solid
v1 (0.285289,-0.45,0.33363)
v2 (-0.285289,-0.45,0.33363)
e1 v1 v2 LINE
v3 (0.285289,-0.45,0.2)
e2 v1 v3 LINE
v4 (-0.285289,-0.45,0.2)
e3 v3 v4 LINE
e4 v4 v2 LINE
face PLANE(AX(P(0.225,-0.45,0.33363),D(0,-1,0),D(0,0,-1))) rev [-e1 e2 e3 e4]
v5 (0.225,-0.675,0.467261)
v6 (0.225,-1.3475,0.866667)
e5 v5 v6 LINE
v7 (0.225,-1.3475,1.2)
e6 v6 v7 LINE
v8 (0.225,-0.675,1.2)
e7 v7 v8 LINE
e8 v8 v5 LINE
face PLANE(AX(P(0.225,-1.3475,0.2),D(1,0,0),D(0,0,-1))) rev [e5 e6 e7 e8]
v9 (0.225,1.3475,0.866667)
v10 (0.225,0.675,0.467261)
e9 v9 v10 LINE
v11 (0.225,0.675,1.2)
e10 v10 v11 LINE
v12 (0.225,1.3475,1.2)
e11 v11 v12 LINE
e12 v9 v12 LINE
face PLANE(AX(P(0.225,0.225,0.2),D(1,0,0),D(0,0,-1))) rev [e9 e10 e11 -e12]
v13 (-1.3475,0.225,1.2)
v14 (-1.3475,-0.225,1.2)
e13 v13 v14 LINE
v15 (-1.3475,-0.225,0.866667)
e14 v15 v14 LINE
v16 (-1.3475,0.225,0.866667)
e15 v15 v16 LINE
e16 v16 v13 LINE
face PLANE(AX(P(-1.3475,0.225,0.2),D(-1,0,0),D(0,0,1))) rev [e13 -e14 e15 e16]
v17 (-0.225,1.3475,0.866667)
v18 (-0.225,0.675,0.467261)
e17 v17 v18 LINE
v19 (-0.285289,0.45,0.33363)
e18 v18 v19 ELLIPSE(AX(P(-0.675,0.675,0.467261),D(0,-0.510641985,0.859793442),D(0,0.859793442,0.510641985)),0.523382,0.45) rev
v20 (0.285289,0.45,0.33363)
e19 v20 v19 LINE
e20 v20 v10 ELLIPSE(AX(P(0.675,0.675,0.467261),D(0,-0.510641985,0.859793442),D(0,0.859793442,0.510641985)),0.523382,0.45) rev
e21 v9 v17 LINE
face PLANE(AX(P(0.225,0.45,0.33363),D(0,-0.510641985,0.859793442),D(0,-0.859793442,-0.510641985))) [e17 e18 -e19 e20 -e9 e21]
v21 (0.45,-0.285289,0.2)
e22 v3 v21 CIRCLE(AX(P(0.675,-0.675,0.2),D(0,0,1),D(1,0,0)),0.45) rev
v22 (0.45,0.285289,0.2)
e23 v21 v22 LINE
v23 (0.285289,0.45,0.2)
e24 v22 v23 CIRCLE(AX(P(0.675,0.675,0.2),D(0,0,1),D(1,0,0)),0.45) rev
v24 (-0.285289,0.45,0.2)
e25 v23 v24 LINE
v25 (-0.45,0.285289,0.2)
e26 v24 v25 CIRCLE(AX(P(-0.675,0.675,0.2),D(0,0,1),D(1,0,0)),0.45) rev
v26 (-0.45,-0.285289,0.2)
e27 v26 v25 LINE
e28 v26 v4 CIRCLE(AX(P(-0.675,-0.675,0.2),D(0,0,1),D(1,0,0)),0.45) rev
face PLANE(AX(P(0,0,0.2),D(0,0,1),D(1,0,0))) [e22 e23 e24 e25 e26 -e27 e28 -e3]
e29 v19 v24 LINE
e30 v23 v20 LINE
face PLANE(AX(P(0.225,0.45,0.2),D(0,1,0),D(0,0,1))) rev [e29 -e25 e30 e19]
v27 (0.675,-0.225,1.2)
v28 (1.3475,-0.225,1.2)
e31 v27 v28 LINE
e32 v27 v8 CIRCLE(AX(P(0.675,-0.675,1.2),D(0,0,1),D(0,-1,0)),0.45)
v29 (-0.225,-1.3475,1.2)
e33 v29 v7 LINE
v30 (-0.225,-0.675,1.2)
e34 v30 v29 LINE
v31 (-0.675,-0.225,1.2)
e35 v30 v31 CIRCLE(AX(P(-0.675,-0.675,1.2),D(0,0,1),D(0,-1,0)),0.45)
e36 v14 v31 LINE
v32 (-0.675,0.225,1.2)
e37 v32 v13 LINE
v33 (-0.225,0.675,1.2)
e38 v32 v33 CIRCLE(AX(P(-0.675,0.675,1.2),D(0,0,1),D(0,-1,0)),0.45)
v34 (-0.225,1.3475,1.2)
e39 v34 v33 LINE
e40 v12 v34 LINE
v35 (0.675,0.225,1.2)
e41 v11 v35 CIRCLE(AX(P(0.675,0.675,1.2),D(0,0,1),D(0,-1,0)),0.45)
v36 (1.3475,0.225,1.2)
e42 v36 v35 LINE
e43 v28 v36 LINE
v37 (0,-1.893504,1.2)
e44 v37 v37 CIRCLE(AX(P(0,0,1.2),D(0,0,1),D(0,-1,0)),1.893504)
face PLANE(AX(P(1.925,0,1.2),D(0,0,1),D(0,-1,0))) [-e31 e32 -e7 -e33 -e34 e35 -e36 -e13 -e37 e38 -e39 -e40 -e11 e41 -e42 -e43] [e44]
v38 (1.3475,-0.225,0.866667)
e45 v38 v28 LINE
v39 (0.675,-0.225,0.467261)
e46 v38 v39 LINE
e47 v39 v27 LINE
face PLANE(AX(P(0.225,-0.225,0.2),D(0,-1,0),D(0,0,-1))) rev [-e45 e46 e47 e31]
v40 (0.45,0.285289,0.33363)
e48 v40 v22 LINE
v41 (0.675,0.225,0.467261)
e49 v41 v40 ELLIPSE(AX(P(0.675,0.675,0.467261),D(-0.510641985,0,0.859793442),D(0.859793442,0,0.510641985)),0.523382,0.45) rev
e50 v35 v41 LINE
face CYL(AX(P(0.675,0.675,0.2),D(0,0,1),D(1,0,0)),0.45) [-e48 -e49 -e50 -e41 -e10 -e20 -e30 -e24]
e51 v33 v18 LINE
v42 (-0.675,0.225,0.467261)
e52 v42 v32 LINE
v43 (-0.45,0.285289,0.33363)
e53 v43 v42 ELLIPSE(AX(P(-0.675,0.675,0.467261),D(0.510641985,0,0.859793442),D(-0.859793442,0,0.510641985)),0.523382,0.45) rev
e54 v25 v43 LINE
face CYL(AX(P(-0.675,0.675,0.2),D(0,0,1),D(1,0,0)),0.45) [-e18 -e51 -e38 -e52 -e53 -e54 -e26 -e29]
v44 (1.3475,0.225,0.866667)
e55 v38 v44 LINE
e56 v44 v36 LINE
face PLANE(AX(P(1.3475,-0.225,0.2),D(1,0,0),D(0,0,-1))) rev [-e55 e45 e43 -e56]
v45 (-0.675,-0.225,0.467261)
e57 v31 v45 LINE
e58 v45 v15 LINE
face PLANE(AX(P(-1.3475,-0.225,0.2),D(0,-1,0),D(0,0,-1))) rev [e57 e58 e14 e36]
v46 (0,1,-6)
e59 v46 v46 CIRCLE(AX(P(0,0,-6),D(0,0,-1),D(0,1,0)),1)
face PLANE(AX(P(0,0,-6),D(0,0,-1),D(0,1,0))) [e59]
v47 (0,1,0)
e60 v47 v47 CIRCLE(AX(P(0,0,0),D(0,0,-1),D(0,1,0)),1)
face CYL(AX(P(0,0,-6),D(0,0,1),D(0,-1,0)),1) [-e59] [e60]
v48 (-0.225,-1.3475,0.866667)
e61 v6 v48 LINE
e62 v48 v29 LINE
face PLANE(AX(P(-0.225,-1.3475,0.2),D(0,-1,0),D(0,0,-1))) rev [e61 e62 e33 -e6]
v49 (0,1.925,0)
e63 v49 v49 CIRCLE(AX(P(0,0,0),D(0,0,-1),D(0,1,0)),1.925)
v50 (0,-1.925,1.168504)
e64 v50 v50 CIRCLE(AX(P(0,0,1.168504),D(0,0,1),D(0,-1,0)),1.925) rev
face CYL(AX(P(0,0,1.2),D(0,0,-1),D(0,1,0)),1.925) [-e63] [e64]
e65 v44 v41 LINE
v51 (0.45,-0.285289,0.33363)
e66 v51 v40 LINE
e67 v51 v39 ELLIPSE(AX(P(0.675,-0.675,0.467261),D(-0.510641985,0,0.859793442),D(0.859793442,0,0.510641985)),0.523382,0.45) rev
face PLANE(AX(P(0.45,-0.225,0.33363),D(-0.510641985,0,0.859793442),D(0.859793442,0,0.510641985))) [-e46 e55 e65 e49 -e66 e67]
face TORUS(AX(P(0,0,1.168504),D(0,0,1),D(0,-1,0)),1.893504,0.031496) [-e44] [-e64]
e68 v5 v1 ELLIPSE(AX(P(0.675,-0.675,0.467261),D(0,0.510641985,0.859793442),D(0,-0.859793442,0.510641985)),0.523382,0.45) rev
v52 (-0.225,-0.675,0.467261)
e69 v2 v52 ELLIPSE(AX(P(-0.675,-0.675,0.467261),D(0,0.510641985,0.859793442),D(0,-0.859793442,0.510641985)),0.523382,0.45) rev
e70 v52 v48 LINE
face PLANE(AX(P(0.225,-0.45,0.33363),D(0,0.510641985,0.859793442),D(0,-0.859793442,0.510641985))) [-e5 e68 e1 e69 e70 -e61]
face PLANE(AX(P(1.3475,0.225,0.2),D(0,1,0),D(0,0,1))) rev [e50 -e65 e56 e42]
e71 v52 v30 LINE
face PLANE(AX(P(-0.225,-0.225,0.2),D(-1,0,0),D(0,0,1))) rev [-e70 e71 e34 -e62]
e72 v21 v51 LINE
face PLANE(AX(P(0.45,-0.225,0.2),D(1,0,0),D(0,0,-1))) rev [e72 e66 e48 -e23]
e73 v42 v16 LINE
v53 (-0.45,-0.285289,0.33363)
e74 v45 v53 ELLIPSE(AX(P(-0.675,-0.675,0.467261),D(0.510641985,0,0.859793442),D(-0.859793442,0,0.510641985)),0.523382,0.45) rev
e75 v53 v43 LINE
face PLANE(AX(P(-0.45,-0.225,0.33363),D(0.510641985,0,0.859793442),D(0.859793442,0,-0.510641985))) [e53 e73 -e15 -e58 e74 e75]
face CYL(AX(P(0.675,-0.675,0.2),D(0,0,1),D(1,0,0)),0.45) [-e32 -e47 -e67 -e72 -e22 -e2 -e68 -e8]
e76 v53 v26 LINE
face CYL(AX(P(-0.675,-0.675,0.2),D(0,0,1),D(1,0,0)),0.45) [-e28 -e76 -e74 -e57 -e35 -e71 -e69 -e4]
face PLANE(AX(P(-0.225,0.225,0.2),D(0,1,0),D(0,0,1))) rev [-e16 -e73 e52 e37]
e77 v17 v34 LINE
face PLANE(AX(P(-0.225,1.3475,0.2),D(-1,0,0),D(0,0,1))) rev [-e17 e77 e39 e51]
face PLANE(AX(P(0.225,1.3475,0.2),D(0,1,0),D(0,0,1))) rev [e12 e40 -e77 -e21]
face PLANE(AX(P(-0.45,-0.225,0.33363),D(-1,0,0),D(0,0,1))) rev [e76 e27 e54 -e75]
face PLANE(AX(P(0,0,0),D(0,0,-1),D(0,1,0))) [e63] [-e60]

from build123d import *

# Parameters (mm, degrees)
SKETCH_1_W          = 1.925
SKETCH_1_H          = 1.2
CUT_EXTRUDE_1_DEPTH = 1
SKETCH_3_W          = 0.8975
SKETCH_3_H          = 0.13363029
EXTRUDE_1_DEPTH     = 0.45
SKETCH_4_W          = 0.13363029
SKETCH_4_H          = 0.8975
EXTRUDE_2_DEPTH     = 0.45
SKETCH_5_W          = 0.8975
SKETCH_5_H          = 0.13363029
EXTRUDE_3_DEPTH     = 0.45
SKETCH_6_W          = 0.13363029
SKETCH_6_H          = 0.8975
EXTRUDE_4_DEPTH     = 0.45
SKETCH_7_R          = 1
EXTRUDE_5_DEPTH     = 6
DRAFT_1_ANGLE       = 30.706601503
DRAFT_2_ANGLE       = 30.706601503
DRAFT_3_ANGLE       = 30.706601503
DRAFT_4_ANGLE       = 30.706601503
FILLET_1_R          = 0.031496063
FILLET_2_R          = 0.45


with BuildPart() as part:
    # 草图1 → 旋转1 (revolve)
    with BuildSketch(Plane.XZ, mode=Mode.PRIVATE) as revolve_1_sk:
        with Locations((0.9625, 0.6)):
            Rectangle(SKETCH_1_W, SKETCH_1_H)
    revolve(revolve_1_sk.sketch.rotate(Axis((0, 0, 1.2), (0, 0, -1)), 270), axis=Axis((0, 0, 1.2), (0, 0, -1)))

    # 草图2 → 切除-拉伸1 (cut)
    with BuildSketch(Plane.XY.offset(1.2)):
        Polygon((0.225, 1.3475), (-0.225, 1.3475), (-0.225, 0.225), (-1.3475, 0.225), (-1.3475, -0.225), (-0.225, -0.225), (-0.225, -1.3475), (0.225, -1.3475), (0.225, -0.225), (1.3475, -0.225), (1.3475, 0.225), (0.225, 0.225), align=None)
    extrude(amount=-CUT_EXTRUDE_1_DEPTH, mode=Mode.SUBTRACT)

    # 草图3 → 凸台-拉伸1 (add)
    with BuildSketch(Plane.XZ.offset(-0.225)):
        with Locations((-0.89875, 0.266815145)):
            Rectangle(SKETCH_3_W, SKETCH_3_H)
    extrude(amount=EXTRUDE_1_DEPTH)

    # 草图4 → 凸台-拉伸2 (add)
    with BuildSketch(Plane(origin=(-0.225, 0, 0), x_dir=(0, 0, -1), z_dir=(1, 0, 0))):
        with Locations((-0.266815145, 0.89875)):
            Rectangle(SKETCH_4_W, SKETCH_4_H)
    extrude(amount=EXTRUDE_2_DEPTH)

    # 草图5 → 凸台-拉伸3 (add)
    with BuildSketch(Plane.XZ.offset(-0.225)):
        with Locations((0.89875, 0.266815145)):
            Rectangle(SKETCH_5_W, SKETCH_5_H)
    extrude(amount=EXTRUDE_3_DEPTH)

    # 草图6 → 凸台-拉伸4 (add)
    with BuildSketch(Plane(origin=(-0.225, 0, 0), x_dir=(0, 0, -1), z_dir=(1, 0, 0))):
        with Locations((-0.266815145, -0.89875)):
            Rectangle(SKETCH_6_W, SKETCH_6_H)
    extrude(amount=EXTRUDE_4_DEPTH)

    # 草图7 → 凸台-拉伸5 (add)
    with BuildSketch(Plane(origin=(0, 0, 0), x_dir=(-1, 0, 0), z_dir=(0, 0, -1))):
        with Locations(Location((0, 0, 0), (0, 0, 90))):
            Circle(SKETCH_7_R)
    extrude(amount=EXTRUDE_5_DEPTH)

    # 拔模1
    draft_1_faces = [part.faces().sort_by_distance(p)[0] for p in [
        (0, 0.89875, 0.33363029),
    ]]
    draft(draft_1_faces, Plane(origin=(0.225, 0.45, 0.2), x_dir=(0, 0, -1), z_dir=(0, -1, 0)), DRAFT_1_ANGLE)

    # 拔模2
    draft_2_faces = [part.faces().sort_by_distance(p)[0] for p in [
        (0.89875, 0, 0.33363029),
    ]]
    draft(draft_2_faces, Plane(origin=(0.45, -0.225, 0.2), x_dir=(0, 0, -1), z_dir=(-1, 0, 0)), DRAFT_2_ANGLE)

    # 拔模3
    draft_3_faces = [part.faces().sort_by_distance(p)[0] for p in [
        (0, -0.89875, 0.33363029),
    ]]
    draft(draft_3_faces, Plane(origin=(0.225, -0.45, 0.33363029), x_dir=(0, 0, 1), z_dir=(0, 1, 0)), DRAFT_3_ANGLE)

    # 拔模4
    draft_4_faces = [part.faces().sort_by_distance(p)[0] for p in [
        (-0.89875, 0, 0.33363029),
    ]]
    draft(draft_4_faces, Plane(origin=(-0.45, -0.225, 0.33363029), x_dir=(0, 0, 1), z_dir=(1, 0, 0)), DRAFT_4_ANGLE)

    # 圆角1
    fillet_1_edges = [part.edges().sort_by_distance(p)[0] for p in [
        (0, -1.925, 1.2),
    ]]
    fillet(fillet_1_edges, radius=FILLET_1_R)

    # 圆角2
    # the kernel refuses this fillet: 0.45 mm, written as the material it takes off along each edge
    with BuildSketch(Plane(origin=(0.225, 0.225, 2.325), x_dir=(0, 1, 0), z_dir=(0, 0, -1))) as fillet_2_piece_1_section:
        with BuildLine():
            CenterArc((FILLET_2_R, FILLET_2_R), FILLET_2_R, 180, 90)
            Line((0, FILLET_2_R), (0, 0))
            Line((0, 0), (FILLET_2_R, 0))
        make_face()
    fillet_2_piece_1 = extrude(amount=3.25, mode=Mode.PRIVATE)
    fillet_2_piece_1 = split(fillet_2_piece_1, bisect_by=Plane(origin=(0.243098692, 0.68726219, 0.474543246), z_dir=(0, -0.5106419849565733, 0.8597934421706244)), keep=Keep.TOP, mode=Mode.PRIVATE)
    fillet_2_piece_1 = split(fillet_2_piece_1, bisect_by=Plane(origin=(0.45, 0.504131357, 0.782889786), z_dir=(-1, 0, 0)), keep=Keep.TOP, mode=Mode.PRIVATE)
    add(fillet_2_piece_1, mode=Mode.SUBTRACT)
    with BuildSketch(Plane(origin=(0.225, 0.225, 2.325), x_dir=(0, 1, 0), z_dir=(0, 0, -1))) as fillet_2_piece_2_section:
        with BuildLine():
            CenterArc((FILLET_2_R, FILLET_2_R), FILLET_2_R, 180, 90)
            Line((0, FILLET_2_R), (0, 0))
            Line((0, 0), (FILLET_2_R, 0))
        make_face()
    fillet_2_piece_2 = extrude(amount=3.25, mode=Mode.PRIVATE)
    fillet_2_piece_2 = split(fillet_2_piece_2, bisect_by=Plane(origin=(0.504131356, 0.45, 0.782889786), z_dir=(0, -1, 0)), keep=Keep.TOP, mode=Mode.PRIVATE)
    fillet_2_piece_2 = split(fillet_2_piece_2, bisect_by=Plane(origin=(0.68726219, 0.243098692, 0.474543246), z_dir=(-0.5106419849565748, 0, 0.8597934421706236)), keep=Keep.TOP, mode=Mode.PRIVATE)
    add(fillet_2_piece_2, mode=Mode.SUBTRACT)
    with BuildSketch(Plane(origin=(0.225, 0.225, 2.325), x_dir=(0, 1, 0), z_dir=(0, 0, -1))) as fillet_2_piece_3_section:
        with BuildLine():
            CenterArc((FILLET_2_R, FILLET_2_R), FILLET_2_R, 180, 90)
            Line((0, FILLET_2_R), (0, 0))
            Line((0, 0), (FILLET_2_R, 0))
        make_face()
    fillet_2_piece_3 = extrude(amount=2.125, mode=Mode.PRIVATE)
    fillet_2_piece_3 = split(fillet_2_piece_3, bisect_by=Plane(origin=(0.325721218, 0.45, 0.219864503), z_dir=(0, -1, 0)), keep=Keep.TOP, mode=Mode.PRIVATE)
    fillet_2_piece_3 = split(fillet_2_piece_3, bisect_by=Plane(origin=(0.45, 0.325721218, 0.219864503), z_dir=(-1, 0, 0)), keep=Keep.TOP, mode=Mode.PRIVATE)
    add(fillet_2_piece_3, mode=Mode.SUBTRACT)
    with BuildSketch(Plane(origin=(0.225, -0.225, 2.325), x_dir=(1, 0, 0), z_dir=(0, 0, -1))) as fillet_2_piece_4_section:
        with BuildLine():
            CenterArc((FILLET_2_R, FILLET_2_R), FILLET_2_R, 180, 90)
            Line((0, FILLET_2_R), (0, 0))
            Line((0, 0), (FILLET_2_R, 0))
        make_face()
    fillet_2_piece_4 = extrude(amount=3.25, mode=Mode.PRIVATE)
    fillet_2_piece_4 = split(fillet_2_piece_4, bisect_by=Plane(origin=(0.68726219, -0.243098692, 0.474543246), z_dir=(-0.5106419849565748, 0, 0.8597934421706236)), keep=Keep.TOP, mode=Mode.PRIVATE)
    fillet_2_piece_4 = split(fillet_2_piece_4, bisect_by=Plane(origin=(0.504131357, -0.45, 0.782889786), z_dir=(0, 1, 0)), keep=Keep.TOP, mode=Mode.PRIVATE)
    add(fillet_2_piece_4, mode=Mode.SUBTRACT)
    with BuildSketch(Plane(origin=(0.225, -0.225, 2.325), x_dir=(1, 0, 0), z_dir=(0, 0, -1))) as fillet_2_piece_5_section:
        with BuildLine():
            CenterArc((FILLET_2_R, FILLET_2_R), FILLET_2_R, 180, 90)
            Line((0, FILLET_2_R), (0, 0))
            Line((0, 0), (FILLET_2_R, 0))
        make_face()
    fillet_2_piece_5 = extrude(amount=3.25, mode=Mode.PRIVATE)
    fillet_2_piece_5 = split(fillet_2_piece_5, bisect_by=Plane(origin=(0.45, -0.504131356, 0.782889786), z_dir=(-1, 0, 0)), keep=Keep.TOP, mode=Mode.PRIVATE)
    fillet_2_piece_5 = split(fillet_2_piece_5, bisect_by=Plane(origin=(0.243098692, -0.68726219, 0.474543246), z_dir=(0, 0.5106419849565746, 0.8597934421706236)), keep=Keep.TOP, mode=Mode.PRIVATE)
    add(fillet_2_piece_5, mode=Mode.SUBTRACT)
    with BuildSketch(Plane(origin=(0.225, -0.225, 2.325), x_dir=(1, 0, 0), z_dir=(0, 0, -1))) as fillet_2_piece_6_section:
        with BuildLine():
            CenterArc((FILLET_2_R, FILLET_2_R), FILLET_2_R, 180, 90)
            Line((0, FILLET_2_R), (0, 0))
            Line((0, 0), (FILLET_2_R, 0))
        make_face()
    fillet_2_piece_6 = extrude(amount=2.125, mode=Mode.PRIVATE)
    fillet_2_piece_6 = split(fillet_2_piece_6, bisect_by=Plane(origin=(0.45, -0.325721218, 0.219864503), z_dir=(-1, 0, 0)), keep=Keep.TOP, mode=Mode.PRIVATE)
    fillet_2_piece_6 = split(fillet_2_piece_6, bisect_by=Plane(origin=(0.325721218, -0.45, 0.219864503), z_dir=(0, 1, 0)), keep=Keep.TOP, mode=Mode.PRIVATE)
    add(fillet_2_piece_6, mode=Mode.SUBTRACT)
    with BuildSketch(Plane(origin=(-0.225, 0.225, 2.325), x_dir=(-1, 0, 0), z_dir=(0, 0, -1))) as fillet_2_piece_7_section:
        with BuildLine():
            CenterArc((FILLET_2_R, FILLET_2_R), FILLET_2_R, 180, 90)
            Line((0, FILLET_2_R), (0, 0))
            Line((0, 0), (FILLET_2_R, 0))
        make_face()
    fillet_2_piece_7 = extrude(amount=3.25, mode=Mode.PRIVATE)
    fillet_2_piece_7 = split(fillet_2_piece_7, bisect_by=Plane(origin=(-0.504131357, 0.45, 0.782889786), z_dir=(0, -1, 0)), keep=Keep.TOP, mode=Mode.PRIVATE)
    fillet_2_piece_7 = split(fillet_2_piece_7, bisect_by=Plane(origin=(-0.68726219, 0.243098692, 0.474543246), z_dir=(0.5106419849565733, 0, 0.8597934421706244)), keep=Keep.TOP, mode=Mode.PRIVATE)
    add(fillet_2_piece_7, mode=Mode.SUBTRACT)
    with BuildSketch(Plane(origin=(-0.225, 0.225, 2.325), x_dir=(-1, 0, 0), z_dir=(0, 0, -1))) as fillet_2_piece_8_section:
        with BuildLine():
            CenterArc((FILLET_2_R, FILLET_2_R), FILLET_2_R, 180, 90)
            Line((0, FILLET_2_R), (0, 0))
            Line((0, 0), (FILLET_2_R, 0))
        make_face()
    fillet_2_piece_8 = extrude(amount=3.25, mode=Mode.PRIVATE)
    fillet_2_piece_8 = split(fillet_2_piece_8, bisect_by=Plane(origin=(-0.243098692, 0.68726219, 0.474543246), z_dir=(0, -0.5106419849565733, 0.8597934421706244)), keep=Keep.TOP, mode=Mode.PRIVATE)
    fillet_2_piece_8 = split(fillet_2_piece_8, bisect_by=Plane(origin=(-0.45, 0.504131356, 0.782889786), z_dir=(1, 0, 0)), keep=Keep.TOP, mode=Mode.PRIVATE)
    add(fillet_2_piece_8, mode=Mode.SUBTRACT)
    with BuildSketch(Plane(origin=(-0.225, 0.225, 2.325), x_dir=(-1, 0, 0), z_dir=(0, 0, -1))) as fillet_2_piece_9_section:
        with BuildLine():
            CenterArc((FILLET_2_R, FILLET_2_R), FILLET_2_R, 180, 90)
            Line((0, FILLET_2_R), (0, 0))
            Line((0, 0), (FILLET_2_R, 0))
        make_face()
    fillet_2_piece_9 = extrude(amount=2.125, mode=Mode.PRIVATE)
    fillet_2_piece_9 = split(fillet_2_piece_9, bisect_by=Plane(origin=(-0.325721218, 0.45, 0.219864503), z_dir=(0, -1, 0)), keep=Keep.TOP, mode=Mode.PRIVATE)
    fillet_2_piece_9 = split(fillet_2_piece_9, bisect_by=Plane(origin=(-0.45, 0.325721218, 0.219864503), z_dir=(1, 0, 0)), keep=Keep.TOP, mode=Mode.PRIVATE)
    add(fillet_2_piece_9, mode=Mode.SUBTRACT)
    with BuildSketch(Plane(origin=(-0.225, -0.225, 2.325), x_dir=(0, -1, 0), z_dir=(0, 0, -1))) as fillet_2_piece_10_section:
        with BuildLine():
            CenterArc((FILLET_2_R, FILLET_2_R), FILLET_2_R, 180, 90)
            Line((0, FILLET_2_R), (0, 0))
            Line((0, 0), (FILLET_2_R, 0))
        make_face()
    fillet_2_piece_10 = extrude(amount=3.25, mode=Mode.PRIVATE)
    fillet_2_piece_10 = split(fillet_2_piece_10, bisect_by=Plane(origin=(-0.243098692, -0.68726219, 0.474543246), z_dir=(0, 0.5106419849565746, 0.8597934421706236)), keep=Keep.TOP, mode=Mode.PRIVATE)
    fillet_2_piece_10 = split(fillet_2_piece_10, bisect_by=Plane(origin=(-0.45, -0.504131357, 0.782889786), z_dir=(1, 0, 0)), keep=Keep.TOP, mode=Mode.PRIVATE)
    add(fillet_2_piece_10, mode=Mode.SUBTRACT)
    with BuildSketch(Plane(origin=(-0.225, -0.225, 2.325), x_dir=(0, -1, 0), z_dir=(0, 0, -1))) as fillet_2_piece_11_section:
        with BuildLine():
            CenterArc((FILLET_2_R, FILLET_2_R), FILLET_2_R, 180, 90)
            Line((0, FILLET_2_R), (0, 0))
            Line((0, 0), (FILLET_2_R, 0))
        make_face()
    fillet_2_piece_11 = extrude(amount=3.25, mode=Mode.PRIVATE)
    fillet_2_piece_11 = split(fillet_2_piece_11, bisect_by=Plane(origin=(-0.504131356, -0.45, 0.782889786), z_dir=(0, 1, 0)), keep=Keep.TOP, mode=Mode.PRIVATE)
    fillet_2_piece_11 = split(fillet_2_piece_11, bisect_by=Plane(origin=(-0.68726219, -0.243098692, 0.474543246), z_dir=(0.5106419849565733, 0, 0.8597934421706244)), keep=Keep.TOP, mode=Mode.PRIVATE)
    add(fillet_2_piece_11, mode=Mode.SUBTRACT)
    with BuildSketch(Plane(origin=(-0.225, -0.225, 2.325), x_dir=(0, -1, 0), z_dir=(0, 0, -1))) as fillet_2_piece_12_section:
        with BuildLine():
            CenterArc((FILLET_2_R, FILLET_2_R), FILLET_2_R, 180, 90)
            Line((0, FILLET_2_R), (0, 0))
            Line((0, 0), (FILLET_2_R, 0))
        make_face()
    fillet_2_piece_12 = extrude(amount=2.125, mode=Mode.PRIVATE)
    fillet_2_piece_12 = split(fillet_2_piece_12, bisect_by=Plane(origin=(-0.325721218, -0.45, 0.219864503), z_dir=(0, 1, 0)), keep=Keep.TOP, mode=Mode.PRIVATE)
    fillet_2_piece_12 = split(fillet_2_piece_12, bisect_by=Plane(origin=(-0.45, -0.325721218, 0.219864503), z_dir=(1, 0, 0)), keep=Keep.TOP, mode=Mode.PRIVATE)
    add(fillet_2_piece_12, mode=Mode.SUBTRACT)


solid = part.part
